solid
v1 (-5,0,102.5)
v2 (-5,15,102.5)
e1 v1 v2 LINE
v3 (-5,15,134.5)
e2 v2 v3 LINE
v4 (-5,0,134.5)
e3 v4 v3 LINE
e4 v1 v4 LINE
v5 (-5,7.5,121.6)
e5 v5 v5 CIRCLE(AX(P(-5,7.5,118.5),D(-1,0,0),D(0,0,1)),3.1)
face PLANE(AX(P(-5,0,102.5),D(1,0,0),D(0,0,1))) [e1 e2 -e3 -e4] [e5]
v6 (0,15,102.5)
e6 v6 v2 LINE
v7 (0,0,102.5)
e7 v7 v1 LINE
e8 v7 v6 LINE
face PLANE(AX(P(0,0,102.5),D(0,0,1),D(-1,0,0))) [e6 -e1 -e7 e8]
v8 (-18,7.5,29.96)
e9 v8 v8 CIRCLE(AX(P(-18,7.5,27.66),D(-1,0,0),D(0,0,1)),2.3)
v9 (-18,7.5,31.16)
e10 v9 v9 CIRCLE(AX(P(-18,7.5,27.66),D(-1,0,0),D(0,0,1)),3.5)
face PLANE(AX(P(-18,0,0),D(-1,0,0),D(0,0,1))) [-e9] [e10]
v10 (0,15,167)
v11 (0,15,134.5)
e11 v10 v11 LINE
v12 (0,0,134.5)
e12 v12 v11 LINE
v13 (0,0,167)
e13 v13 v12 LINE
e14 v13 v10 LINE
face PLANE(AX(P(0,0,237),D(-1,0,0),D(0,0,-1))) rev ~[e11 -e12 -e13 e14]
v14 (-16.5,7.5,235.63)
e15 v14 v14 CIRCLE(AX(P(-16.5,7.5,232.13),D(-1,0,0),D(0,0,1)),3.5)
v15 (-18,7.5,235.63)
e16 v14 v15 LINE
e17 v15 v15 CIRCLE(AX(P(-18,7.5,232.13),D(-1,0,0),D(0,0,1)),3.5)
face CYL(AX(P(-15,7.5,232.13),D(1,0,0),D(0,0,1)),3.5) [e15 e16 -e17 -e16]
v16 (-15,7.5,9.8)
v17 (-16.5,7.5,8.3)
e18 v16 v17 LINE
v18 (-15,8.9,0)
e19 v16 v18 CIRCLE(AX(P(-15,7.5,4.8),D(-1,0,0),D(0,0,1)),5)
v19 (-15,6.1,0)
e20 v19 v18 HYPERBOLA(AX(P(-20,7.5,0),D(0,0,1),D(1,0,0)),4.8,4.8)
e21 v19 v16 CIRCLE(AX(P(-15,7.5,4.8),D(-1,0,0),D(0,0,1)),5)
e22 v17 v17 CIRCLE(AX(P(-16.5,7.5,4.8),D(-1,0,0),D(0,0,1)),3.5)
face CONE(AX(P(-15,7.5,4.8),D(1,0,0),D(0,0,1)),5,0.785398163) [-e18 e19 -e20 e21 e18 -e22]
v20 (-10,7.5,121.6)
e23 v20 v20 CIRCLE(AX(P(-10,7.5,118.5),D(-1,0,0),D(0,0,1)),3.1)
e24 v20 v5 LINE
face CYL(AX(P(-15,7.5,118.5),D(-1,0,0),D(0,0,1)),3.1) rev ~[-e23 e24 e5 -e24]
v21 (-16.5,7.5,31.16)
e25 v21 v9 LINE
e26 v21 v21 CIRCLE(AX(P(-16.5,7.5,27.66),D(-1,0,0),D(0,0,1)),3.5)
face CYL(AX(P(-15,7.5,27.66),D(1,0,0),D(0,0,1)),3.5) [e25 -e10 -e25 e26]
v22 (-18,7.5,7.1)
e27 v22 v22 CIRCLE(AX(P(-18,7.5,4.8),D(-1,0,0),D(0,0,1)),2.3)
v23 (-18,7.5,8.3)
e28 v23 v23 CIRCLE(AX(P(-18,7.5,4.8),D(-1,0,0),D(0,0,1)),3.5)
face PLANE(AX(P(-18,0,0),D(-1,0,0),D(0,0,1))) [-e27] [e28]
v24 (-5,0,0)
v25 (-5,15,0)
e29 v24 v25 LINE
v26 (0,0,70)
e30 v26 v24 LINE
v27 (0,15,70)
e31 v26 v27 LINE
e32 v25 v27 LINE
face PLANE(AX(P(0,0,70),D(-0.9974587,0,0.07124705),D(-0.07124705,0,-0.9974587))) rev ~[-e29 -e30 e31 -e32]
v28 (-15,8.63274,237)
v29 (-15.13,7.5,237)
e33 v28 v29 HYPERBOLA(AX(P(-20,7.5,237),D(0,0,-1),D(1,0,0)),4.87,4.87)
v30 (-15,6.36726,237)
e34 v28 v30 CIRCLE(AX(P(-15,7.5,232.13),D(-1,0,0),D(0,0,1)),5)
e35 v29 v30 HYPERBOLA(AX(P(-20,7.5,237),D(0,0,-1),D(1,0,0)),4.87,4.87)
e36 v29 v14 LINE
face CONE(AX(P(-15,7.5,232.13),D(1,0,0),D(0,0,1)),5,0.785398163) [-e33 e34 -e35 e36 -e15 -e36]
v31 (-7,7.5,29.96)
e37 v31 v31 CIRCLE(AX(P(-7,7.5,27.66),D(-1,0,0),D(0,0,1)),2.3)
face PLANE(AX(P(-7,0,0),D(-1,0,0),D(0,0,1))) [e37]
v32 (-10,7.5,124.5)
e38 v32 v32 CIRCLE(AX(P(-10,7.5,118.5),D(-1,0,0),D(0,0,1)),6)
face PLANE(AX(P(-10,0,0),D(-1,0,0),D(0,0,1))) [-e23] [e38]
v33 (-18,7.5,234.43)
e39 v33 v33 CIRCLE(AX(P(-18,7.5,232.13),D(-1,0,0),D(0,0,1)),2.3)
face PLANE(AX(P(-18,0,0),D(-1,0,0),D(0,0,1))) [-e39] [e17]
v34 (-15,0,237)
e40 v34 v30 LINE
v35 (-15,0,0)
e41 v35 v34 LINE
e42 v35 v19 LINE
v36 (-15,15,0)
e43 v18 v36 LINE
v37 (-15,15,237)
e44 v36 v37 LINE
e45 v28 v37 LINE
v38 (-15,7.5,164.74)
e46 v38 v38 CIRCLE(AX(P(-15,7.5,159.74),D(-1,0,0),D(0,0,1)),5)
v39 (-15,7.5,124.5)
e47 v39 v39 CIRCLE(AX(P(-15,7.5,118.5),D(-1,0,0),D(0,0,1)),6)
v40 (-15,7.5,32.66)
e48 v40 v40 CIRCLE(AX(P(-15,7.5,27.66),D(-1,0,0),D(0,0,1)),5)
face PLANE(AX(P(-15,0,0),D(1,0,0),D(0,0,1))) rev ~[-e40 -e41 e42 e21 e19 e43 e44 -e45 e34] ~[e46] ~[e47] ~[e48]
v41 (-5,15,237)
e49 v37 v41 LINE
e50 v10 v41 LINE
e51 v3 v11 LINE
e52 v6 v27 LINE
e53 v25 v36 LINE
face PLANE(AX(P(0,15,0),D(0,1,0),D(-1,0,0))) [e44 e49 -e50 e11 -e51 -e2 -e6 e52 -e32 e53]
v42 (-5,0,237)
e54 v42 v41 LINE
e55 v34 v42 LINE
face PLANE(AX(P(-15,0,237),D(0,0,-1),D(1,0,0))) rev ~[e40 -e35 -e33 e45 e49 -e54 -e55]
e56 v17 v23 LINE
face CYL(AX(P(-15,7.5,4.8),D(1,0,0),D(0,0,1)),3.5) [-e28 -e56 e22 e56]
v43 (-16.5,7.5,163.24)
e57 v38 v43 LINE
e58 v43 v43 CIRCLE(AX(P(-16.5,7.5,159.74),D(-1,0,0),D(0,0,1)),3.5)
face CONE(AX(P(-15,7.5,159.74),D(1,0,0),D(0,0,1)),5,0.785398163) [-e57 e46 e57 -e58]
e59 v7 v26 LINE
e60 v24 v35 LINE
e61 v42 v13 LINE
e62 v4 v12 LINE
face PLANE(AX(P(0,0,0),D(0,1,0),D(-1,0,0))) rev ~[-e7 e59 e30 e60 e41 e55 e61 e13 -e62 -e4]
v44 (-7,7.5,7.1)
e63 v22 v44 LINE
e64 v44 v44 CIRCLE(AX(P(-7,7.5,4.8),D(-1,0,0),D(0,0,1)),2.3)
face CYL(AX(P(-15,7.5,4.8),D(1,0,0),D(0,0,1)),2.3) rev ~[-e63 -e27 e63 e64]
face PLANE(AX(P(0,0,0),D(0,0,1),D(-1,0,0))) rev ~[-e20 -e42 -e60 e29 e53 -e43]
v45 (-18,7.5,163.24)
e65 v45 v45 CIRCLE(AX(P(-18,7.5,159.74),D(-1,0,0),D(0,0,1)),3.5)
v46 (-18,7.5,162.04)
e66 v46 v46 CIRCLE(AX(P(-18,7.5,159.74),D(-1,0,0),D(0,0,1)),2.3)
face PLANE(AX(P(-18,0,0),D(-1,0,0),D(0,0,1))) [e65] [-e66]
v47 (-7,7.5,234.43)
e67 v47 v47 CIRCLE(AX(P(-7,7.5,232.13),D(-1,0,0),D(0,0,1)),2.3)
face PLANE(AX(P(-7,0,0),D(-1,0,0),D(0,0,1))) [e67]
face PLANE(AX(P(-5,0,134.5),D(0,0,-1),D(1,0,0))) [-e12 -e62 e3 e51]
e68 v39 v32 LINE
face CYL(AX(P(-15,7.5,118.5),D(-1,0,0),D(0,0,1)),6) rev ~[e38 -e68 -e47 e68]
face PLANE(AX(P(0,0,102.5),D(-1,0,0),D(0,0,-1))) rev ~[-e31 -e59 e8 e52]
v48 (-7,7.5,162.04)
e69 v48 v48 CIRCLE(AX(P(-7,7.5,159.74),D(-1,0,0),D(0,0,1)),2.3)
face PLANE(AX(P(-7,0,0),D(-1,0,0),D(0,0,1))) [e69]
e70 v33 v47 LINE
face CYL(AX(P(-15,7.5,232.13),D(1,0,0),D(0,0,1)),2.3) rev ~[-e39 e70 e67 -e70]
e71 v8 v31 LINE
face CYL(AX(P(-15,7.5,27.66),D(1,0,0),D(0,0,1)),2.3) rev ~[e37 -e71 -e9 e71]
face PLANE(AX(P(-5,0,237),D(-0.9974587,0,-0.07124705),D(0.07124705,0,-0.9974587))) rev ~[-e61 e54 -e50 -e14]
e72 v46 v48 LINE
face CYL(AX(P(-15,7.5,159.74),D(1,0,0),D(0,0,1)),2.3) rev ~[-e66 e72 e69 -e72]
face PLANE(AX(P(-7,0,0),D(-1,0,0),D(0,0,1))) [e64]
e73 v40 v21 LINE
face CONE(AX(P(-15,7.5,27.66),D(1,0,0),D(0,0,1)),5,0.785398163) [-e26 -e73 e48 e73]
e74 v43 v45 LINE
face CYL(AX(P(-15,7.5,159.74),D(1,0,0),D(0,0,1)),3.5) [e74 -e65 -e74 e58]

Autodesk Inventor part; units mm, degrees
ref_plane "YZ Plane" through (0, 0, 0) normal (1, 0, 0) x (0, 1, 0)
ref_plane "XZ Plane" through (0, 0, 0) normal (0, 1, 0) x (-1, 0, 0)
ref_plane "XY Plane" through (0, 0, 0) normal (0, 0, 1) x (1, 0, 0)
sketch "Skizze3" plane through (0, 0, 0) normal (0, 1, 0) x (-1, 0, 0)
  line L0 (15, 237) -> (0, 237)
  line L1 (0, 237) -> (0, 0)
  line L2 (0, 0) -> (15, 0)
  line L3 (15, 0) -> (15, 237)
  line L4 (5, 134.5) -> (0, 134.5)
  line L5 (0, 134.5) -> (0, 102.5)
  line L6 (0, 102.5) -> (5, 102.5)
  line L7 (5, 102.5) -> (5, 134.5)
  point P0 (0, 134.5)
  dimension "d17" = 237
  dimension "d18" = 15
  dimension "d19" = 5
  dimension "d20" = 32
  dimension "d69" = 102.5
extrude "Extrusion4" add sketch "Skizze3" along normal blind 15 contours L3 L2 L1 L6 L7 L4 L0
sketch "Skizze6" plane through (0, 0, 0) normal (0, -1, 0) x (1, 0, 0)
  line L0 (0, 70) -> (-5, 0)
  line L1 (0, 0) -> (-15, 0) projected
  line L2 (0, 102.5) -> (0, 0) projected
  line L3 (-5, 237) -> (0, 167)
  line L4 (-15, 237) -> (0, 237) projected
  line L5 (0, 237) -> (0, 134.5) projected
  point P0 (0, 167)
  dimension "d48" = 0
  dimension "d49" = 10
  dimension "d50" = 0
  dimension "d51" = 70
  dimension "d52" = 0
  dimension "d53" = 10
  dimension "d54" = 70
  dimension "d55" = 0
extrude "Extrusion9" cut sketch "Skizze6" against normal blind 20
sketch "Skizze9" plane through (-15, 0, 0) normal (-1, 0, 0) x (0, 0, 1)
  circle A0 centre (118.5, 7.5) radius 3.1
  line L0 (0, 0) -> (0, 15) projected
  line L1 (0, 15) -> (237, 15) projected
  dimension "d70" = 6.2
  dimension "d71" = 118.5
  dimension "d72" = 7.5
extrude "Extrusion12" cut sketch "Skizze9" against normal blind 10
sketch "Skizze10" plane through (-15, 0, 0) normal (-1, 0, 0) x (0, 0, 1)
  circle A0 centre (4.8, 7.5) radius 2.3
  line L0 (0, 15) -> (237, 15) projected
  circle A1 centre (159.74, 7.5) radius 2.3
  circle A2 centre (232.13, 7.5) radius 2.3
  circle A3 centre (27.66, 7.5) radius 2.3
  line L1 (0, 0) -> (0, 15) projected
  dimension "d80" = 4.6
  dimension "d84" = 7.5
  dimension "d85" = 4.6
  dimension "d86" = 4.6
  dimension "d87" = 4.6
  dimension "d88" = 227.33
  dimension "d89" = 4.8
  dimension "d90" = 7.5
  dimension "d91" = 22.86
  dimension "d92" = 7.5
  dimension "d93" = 154.94
  dimension "d94" = 7.5
sketch "Skizze11" plane through (-15, 0, 0) normal (-1, 0, 0) x (0, 0, 1)
  circle A0 centre (118.5, 7.5) radius 3.1 projected
  circle A1 centre (118.5, 7.5) radius 6
  point P0 (0, 0)
  dimension "d81" = 12
extrude "Extrusion15" cut sketch "Skizze11" against normal blind 5
extrude "Extrusion16" cut sketch "Skizze10" against normal blind 8
sketch "Skizze12" plane through (-15, 0, 0) normal (-1, 0, 0) x (0, 0, 1)
  circle A0 centre (159.74, 7.5) radius 2.3 projected
  circle A1 centre (232.13, 7.5) radius 2.3 projected
  circle A2 centre (27.66, 7.5) radius 2.3 projected
  circle A3 centre (4.8, 7.5) radius 2.3 projected
  circle A4 centre (232.13, 7.5) radius 2.3 projected
  circle A5 centre (232.13, 7.5) radius 3.5
  circle A6 centre (159.74, 7.5) radius 2.3 projected
  circle A7 centre (159.74, 7.5) radius 3.5
  circle A8 centre (27.66, 7.5) radius 3.5
  circle A9 centre (4.8, 7.5) radius 3.5
  point P0 (0, 0)
  dimension "d97" = 7
  dimension "d98" = 7
  dimension "d99" = 7
  dimension "d100" = 7
extrude "Extrusion17" add sketch "Skizze12" along normal blind 3
chamfer "Fase3" distance 1.5 angle 45 4 edges at (-15, 7.5, 228.63) (-15, 7.5, 156.24) (-15, 7.5, 24.16) (-15, 7.5, 1.3)
properties part number "atx_mount"
